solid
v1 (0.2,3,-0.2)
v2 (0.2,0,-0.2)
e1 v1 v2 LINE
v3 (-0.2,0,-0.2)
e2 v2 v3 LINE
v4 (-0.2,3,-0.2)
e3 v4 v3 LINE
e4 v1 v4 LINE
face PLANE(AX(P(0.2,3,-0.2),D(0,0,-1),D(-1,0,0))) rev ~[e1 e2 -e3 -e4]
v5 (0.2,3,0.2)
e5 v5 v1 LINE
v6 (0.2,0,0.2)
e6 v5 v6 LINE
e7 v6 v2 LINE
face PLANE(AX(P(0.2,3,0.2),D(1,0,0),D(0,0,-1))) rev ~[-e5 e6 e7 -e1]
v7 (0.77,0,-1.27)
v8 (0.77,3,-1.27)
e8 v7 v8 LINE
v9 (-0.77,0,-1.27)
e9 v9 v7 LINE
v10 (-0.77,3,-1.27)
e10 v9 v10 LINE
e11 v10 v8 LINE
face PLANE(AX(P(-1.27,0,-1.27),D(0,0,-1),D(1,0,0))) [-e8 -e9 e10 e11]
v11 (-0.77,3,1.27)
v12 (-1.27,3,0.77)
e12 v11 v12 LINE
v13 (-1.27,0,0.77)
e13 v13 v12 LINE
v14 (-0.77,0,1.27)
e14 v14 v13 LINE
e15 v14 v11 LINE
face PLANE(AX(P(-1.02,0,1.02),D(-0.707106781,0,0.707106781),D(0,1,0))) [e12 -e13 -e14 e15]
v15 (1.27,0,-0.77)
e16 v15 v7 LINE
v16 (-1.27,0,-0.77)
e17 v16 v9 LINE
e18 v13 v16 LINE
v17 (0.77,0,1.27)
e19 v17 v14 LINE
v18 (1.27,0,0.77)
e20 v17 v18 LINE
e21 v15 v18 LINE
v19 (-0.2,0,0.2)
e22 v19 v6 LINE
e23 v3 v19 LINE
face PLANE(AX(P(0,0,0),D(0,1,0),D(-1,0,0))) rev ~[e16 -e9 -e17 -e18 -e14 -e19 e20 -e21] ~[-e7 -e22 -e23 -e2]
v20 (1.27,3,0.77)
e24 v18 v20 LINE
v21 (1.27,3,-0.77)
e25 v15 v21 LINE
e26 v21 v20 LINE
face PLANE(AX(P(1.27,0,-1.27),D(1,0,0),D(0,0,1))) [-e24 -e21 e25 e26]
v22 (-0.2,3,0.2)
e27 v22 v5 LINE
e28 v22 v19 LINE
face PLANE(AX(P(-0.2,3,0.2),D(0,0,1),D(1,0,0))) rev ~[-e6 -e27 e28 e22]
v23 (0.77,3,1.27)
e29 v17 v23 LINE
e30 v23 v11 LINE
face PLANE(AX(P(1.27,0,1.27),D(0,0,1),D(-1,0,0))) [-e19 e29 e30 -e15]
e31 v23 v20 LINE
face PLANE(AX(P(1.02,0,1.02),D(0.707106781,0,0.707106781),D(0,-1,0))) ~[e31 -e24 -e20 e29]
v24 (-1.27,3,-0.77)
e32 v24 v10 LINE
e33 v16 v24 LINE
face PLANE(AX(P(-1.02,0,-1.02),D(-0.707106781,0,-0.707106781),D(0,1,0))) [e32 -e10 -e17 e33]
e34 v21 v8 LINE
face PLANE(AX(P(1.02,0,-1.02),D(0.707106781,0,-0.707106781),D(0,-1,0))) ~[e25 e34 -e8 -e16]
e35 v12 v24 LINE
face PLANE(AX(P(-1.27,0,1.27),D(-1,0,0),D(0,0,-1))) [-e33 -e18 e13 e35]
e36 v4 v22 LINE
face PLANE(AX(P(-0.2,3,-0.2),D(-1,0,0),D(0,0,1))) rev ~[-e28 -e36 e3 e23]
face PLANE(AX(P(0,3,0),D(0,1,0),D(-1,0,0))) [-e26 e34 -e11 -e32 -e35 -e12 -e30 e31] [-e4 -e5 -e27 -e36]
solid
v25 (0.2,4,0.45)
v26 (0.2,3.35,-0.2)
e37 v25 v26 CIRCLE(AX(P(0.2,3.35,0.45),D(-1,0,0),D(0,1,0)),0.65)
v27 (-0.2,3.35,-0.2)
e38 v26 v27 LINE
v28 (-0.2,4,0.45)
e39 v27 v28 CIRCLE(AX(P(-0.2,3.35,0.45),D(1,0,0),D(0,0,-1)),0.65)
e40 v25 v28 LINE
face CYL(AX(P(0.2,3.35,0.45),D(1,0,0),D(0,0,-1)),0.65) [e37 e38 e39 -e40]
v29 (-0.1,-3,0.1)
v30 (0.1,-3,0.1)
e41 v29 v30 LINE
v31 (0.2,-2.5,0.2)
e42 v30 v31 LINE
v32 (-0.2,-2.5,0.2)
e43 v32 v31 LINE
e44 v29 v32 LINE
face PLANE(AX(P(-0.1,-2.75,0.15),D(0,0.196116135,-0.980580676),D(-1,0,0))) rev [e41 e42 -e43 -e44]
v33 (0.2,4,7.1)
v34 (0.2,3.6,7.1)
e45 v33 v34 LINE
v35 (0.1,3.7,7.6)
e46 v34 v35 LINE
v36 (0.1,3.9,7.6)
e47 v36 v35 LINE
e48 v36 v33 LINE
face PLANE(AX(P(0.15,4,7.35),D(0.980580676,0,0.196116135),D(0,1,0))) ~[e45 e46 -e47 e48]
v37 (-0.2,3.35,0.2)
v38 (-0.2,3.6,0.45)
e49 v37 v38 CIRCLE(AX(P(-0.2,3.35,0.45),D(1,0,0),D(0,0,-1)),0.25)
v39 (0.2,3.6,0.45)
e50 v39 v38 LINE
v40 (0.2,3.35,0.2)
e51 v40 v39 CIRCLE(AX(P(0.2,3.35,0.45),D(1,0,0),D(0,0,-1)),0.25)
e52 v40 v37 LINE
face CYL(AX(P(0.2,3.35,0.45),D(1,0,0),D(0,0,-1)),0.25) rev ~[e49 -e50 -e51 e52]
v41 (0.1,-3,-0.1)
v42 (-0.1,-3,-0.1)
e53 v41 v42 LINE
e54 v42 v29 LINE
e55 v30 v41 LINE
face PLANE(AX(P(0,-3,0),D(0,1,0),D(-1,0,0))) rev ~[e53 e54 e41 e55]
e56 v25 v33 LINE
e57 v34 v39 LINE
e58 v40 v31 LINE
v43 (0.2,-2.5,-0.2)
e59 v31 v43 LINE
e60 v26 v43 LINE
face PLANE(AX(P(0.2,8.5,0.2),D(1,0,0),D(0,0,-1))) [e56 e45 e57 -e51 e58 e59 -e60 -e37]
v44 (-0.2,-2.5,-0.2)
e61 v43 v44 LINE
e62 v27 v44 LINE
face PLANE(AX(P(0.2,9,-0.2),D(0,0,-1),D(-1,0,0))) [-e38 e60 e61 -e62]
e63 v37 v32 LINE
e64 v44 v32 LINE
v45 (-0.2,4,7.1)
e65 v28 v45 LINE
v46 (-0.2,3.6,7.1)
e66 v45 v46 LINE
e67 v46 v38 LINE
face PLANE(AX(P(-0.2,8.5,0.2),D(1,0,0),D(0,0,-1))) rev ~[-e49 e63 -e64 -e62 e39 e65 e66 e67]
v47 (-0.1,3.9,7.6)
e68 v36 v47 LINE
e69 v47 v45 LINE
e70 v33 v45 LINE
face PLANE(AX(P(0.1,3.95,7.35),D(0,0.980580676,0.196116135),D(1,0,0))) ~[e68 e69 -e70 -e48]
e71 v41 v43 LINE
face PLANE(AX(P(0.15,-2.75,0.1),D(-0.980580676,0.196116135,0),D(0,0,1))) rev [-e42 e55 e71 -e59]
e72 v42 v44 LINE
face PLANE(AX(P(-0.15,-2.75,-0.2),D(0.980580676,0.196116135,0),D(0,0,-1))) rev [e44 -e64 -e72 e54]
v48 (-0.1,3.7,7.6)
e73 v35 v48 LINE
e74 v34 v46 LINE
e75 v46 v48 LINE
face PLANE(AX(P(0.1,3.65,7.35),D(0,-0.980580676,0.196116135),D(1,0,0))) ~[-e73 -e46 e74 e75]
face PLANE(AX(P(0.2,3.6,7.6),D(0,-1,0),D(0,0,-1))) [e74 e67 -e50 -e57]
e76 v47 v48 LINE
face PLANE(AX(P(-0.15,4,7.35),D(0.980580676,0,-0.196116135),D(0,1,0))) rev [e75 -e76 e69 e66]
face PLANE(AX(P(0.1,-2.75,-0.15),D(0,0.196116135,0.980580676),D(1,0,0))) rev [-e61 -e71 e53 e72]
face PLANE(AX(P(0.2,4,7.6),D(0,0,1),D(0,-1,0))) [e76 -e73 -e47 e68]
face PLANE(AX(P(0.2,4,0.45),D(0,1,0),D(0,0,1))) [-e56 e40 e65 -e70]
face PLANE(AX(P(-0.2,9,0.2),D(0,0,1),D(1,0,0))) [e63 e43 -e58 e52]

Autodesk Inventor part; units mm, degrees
ref_plane "YZ Plane" through (0, 0, 0) normal (1, 0, 0) x (0, 1, 0)
ref_plane "XZ Plane" through (0, 0, 0) normal (0, 1, 0) x (-1, 0, 0)
ref_plane "XY Plane" through (0, 0, 0) normal (0, 0, 1) x (1, 0, 0)
sketch "Sketch1" plane through (0, 0, 0) normal (0, 1, 0) x (-1, 0, 0)
  line L0 (-1.27, 1.27) -> (1.27, 1.27)
  line L1 (1.27, 1.27) -> (1.27, -1.27)
  line L2 (1.27, -1.27) -> (-1.27, -1.27)
  line L3 (-1.27, -1.27) -> (-1.27, 1.27)
  line L4 (-1.27, 1.27) -> (1.27, -1.27) construction
  line L5 (1.27, 1.27) -> (-1.27, -1.27) construction
  line L6 (-0.3, 0.3) -> (0.3, 0.3)
  line L7 (0.3, 0.3) -> (0.3, -0.3)
  line L8 (0.3, -0.3) -> (-0.3, -0.3)
  line L9 (-0.3, -0.3) -> (-0.3, 0.3)
  line L10 (-0.3, 0.3) -> (0.3, -0.3) construction
  line L11 (0.3, 0.3) -> (-0.3, -0.3) construction
  point P0 (0, 0)
  dimension "d0" = 2.54
  dimension "d1" = 2.54
  dimension "d2" = 0.6
  dimension "d3" = 0.6
extrude "Extrusion1" add sketch "Sketch1" along normal blind 9 and the other way blind 3 contours L6 L7 L8 L9
extrude "Extrusion2" add sketch "Sketch1" along normal blind 3 separate body
sketch "Sketch2" plane through (0, 9, 0) normal (0, 1, 0) x (1, 0, 0)
  line L0 (-0.2, -0.2) -> (0.2, -0.2)
  line L1 (0.2, -0.2) -> (0.2, 0.2)
  line L2 (0.2, 0.2) -> (-0.2, 0.2)
  line L3 (-0.2, 0.2) -> (-0.2, -0.2)
  line L4 (-0.2, -0.2) -> (0.2, 0.2) construction
  line L5 (0.2, -0.2) -> (-0.2, 0.2) construction
  line L6 (-2.0289, -1.4927) -> (2.0289, -1.4927)
  line L7 (2.0289, -1.4927) -> (2.0289, 1.4927)
  line L8 (2.0289, 1.4927) -> (-2.0289, 1.4927)
  line L9 (-2.0289, 1.4927) -> (-2.0289, -1.4927)
  line L10 (-2.0289, -1.4927) -> (2.0289, 1.4927) construction
  line L11 (2.0289, -1.4927) -> (-2.0289, 1.4927) construction
  point P0 (0, 0)
  dimension "d37" = 0.4
  dimension "d38" = 0.4
extrude "Extrusion3" cut sketch "Sketch2" against normal blind 20 bodies 1
sketch "Sketch3" plane through (0, 3, 0) normal (0, 1, 0) x (1, 0, 0)
  line L0 (-0.3, 0.3) -> (0.3, 0.3) projected
  line L1 (-0.3, -0.3) -> (0.3, -0.3)
  line L2 (0.3, -0.3) -> (0.3, 0.3)
  line L3 (0.3, 0.3) -> (-0.3, 0.3)
  line L4 (-0.3, 0.3) -> (-0.3, -0.3)
  line L5 (-0.3, -0.3) -> (0.3, 0.3) construction
  line L6 (0.3, -0.3) -> (-0.3, 0.3) construction
  line L7 (0.2, -0.2) -> (0.2, 0.2) projected
  line L8 (-0.2, -0.2) -> (0.2, -0.2)
  line L9 (0.2, -0.2) -> (0.2, 0.2)
  line L10 (0.2, 0.2) -> (-0.2, 0.2)
  line L11 (-0.2, 0.2) -> (-0.2, -0.2)
  line L12 (-0.2, -0.2) -> (0.2, 0.2) construction
  line L13 (0.2, -0.2) -> (-0.2, 0.2) construction
  point P0 (0, 0)
extrude "Extrusion4" add sketch "Sketch3" against normal blind 3 bodies 2
chamfer "Chamfer10" distance 0.5 angle 45 4 edges at (1.27, 1.5, -1.27) (-1.27, 1.5, -1.27) (-1.27, 1.5, 1.27) (1.27, 1.5, 1.27)
chamfer "Chamfer11" distance 0.1 distance2 0.5 1 edges at (0.2, 9, 0) measured on face at (-0.0667, 9, -0.0667)
chamfer "Chamfer12" distance 0.1 distance2 0.5 1 edges at (-0.05, 9, 0.2) measured on face at (-0.1, 9, -0.0667)
chamfer "Chamfer13" distance 0.1 distance2 0.5 1 edges at (-0.2, 9, -0.05) measured on face at (-0.1, 9, -0.1)
chamfer "Chamfer14" distance 0.1 distance2 0.5 1 edges at (0, 9, -0.2) measured on face at (0.0333, 9, 0)
chamfer "Chamfer15" distance 0.1 distance2 0.5 1 edges at (-0.2, -3, 0) measured on face at (-0.0667, -3, -0.0667)
chamfer "Chamfer16" distance 0.1 distance2 0.5 1 edges at (0.05, -3, 0.2) measured on face at (0, -3, -0.0667)
chamfer "Chamfer17" distance 0.1 distance2 0.5 1 edges at (0.2, -3, -0.05) measured on face at (0.1, -3, 0)
chamfer "Chamfer18" distance 0.1 distance2 0.5 1 edges at (0, -3, -0.2) measured on face at (0.0333, -3, 0)
sketch "Sketch4" plane through (0.2, 8.5, 0.2) normal (1, 0, 0) x (0, 0, -1)
  line L0 (0.4, 0) -> (0.4, -11) projected
  line L1 (0.4, -4.5) -> (-7.4, -4.5)
  line L2 (-7.4, -4.5) -> (-7.4, -4.9)
  line L3 (-7.4, -4.9) -> (-0.25, -4.9)
  line L4 (0.4, -4.9) -> (0.4, -4.5)
  line L5 (0.1, -11.5) -> (0.3, -11.5) projected
  line L6 (0, 0) -> (0, -11) projected
  line L7 (0, -5.15) -> (0, -5.5)
  arc A0 (0, -5.15) -> (-0.25, -4.9) centre (-0.25, -5.15) ccw
  arc A1 (0.4, -5.15) -> (-0.25, -4.5) centre (-0.25, -5.15) ccw
  line L8 (0, -5.15) -> (0.4, -5.15)
  line L9 (0.4, -4.9) -> (0.4, -5.15)
  line L10 (0.4, -4.5) -> (0, -4.5)
  line L11 (0, -4.5) -> (0, 0.5)
  line L12 (0, 0.5) -> (0.4, 0.5)
  line L13 (0.4, 0.5) -> (0.4, -4.5)
  point P0 (0.2, -8.5)
  point P1 (0, -4.9)
  point P2 (0, -4.55)
  dimension "d70" = 0.4
  dimension "d71" = 7
  dimension "d72" = 7.8
  dimension "d73" = 0.25
extrude "Extrusion5" cut sketch "Sketch4" against normal through all contours L0 L1 L6 L11 L12 L13 | L0 A1 L6 L1 bodies 1
extrude "Extrusion6" add sketch "Sketch4" against normal up to surface (0.4 mm away) contours A1 L6 A0 L3 L2 L1 bodies 1
chamfer "Chamfer19" distance 0.5 distance2 0.1 1 edges at (0.2, 3.8, 7.6) measured on face at (0.2, 3.7333, 2.8333)
chamfer "Chamfer20" distance 0.5 distance2 0.1 1 edges at (-0.2, 3.8, 7.6) measured on face at (-0.2, 3.7333, 2.8333)
chamfer "Chamfer21" distance 0.1 distance2 0.5 1 edges at (0, 4, 7.6) measured on face at (0.0333, 3.8667, 7.6)
chamfer "Chamfer22" distance 0.5 distance2 0.1 1 edges at (0, 3.6, 7.6) measured on face at (-0.0667, 3.6, 2.6667)
properties part number "MaleHeaderPin"
